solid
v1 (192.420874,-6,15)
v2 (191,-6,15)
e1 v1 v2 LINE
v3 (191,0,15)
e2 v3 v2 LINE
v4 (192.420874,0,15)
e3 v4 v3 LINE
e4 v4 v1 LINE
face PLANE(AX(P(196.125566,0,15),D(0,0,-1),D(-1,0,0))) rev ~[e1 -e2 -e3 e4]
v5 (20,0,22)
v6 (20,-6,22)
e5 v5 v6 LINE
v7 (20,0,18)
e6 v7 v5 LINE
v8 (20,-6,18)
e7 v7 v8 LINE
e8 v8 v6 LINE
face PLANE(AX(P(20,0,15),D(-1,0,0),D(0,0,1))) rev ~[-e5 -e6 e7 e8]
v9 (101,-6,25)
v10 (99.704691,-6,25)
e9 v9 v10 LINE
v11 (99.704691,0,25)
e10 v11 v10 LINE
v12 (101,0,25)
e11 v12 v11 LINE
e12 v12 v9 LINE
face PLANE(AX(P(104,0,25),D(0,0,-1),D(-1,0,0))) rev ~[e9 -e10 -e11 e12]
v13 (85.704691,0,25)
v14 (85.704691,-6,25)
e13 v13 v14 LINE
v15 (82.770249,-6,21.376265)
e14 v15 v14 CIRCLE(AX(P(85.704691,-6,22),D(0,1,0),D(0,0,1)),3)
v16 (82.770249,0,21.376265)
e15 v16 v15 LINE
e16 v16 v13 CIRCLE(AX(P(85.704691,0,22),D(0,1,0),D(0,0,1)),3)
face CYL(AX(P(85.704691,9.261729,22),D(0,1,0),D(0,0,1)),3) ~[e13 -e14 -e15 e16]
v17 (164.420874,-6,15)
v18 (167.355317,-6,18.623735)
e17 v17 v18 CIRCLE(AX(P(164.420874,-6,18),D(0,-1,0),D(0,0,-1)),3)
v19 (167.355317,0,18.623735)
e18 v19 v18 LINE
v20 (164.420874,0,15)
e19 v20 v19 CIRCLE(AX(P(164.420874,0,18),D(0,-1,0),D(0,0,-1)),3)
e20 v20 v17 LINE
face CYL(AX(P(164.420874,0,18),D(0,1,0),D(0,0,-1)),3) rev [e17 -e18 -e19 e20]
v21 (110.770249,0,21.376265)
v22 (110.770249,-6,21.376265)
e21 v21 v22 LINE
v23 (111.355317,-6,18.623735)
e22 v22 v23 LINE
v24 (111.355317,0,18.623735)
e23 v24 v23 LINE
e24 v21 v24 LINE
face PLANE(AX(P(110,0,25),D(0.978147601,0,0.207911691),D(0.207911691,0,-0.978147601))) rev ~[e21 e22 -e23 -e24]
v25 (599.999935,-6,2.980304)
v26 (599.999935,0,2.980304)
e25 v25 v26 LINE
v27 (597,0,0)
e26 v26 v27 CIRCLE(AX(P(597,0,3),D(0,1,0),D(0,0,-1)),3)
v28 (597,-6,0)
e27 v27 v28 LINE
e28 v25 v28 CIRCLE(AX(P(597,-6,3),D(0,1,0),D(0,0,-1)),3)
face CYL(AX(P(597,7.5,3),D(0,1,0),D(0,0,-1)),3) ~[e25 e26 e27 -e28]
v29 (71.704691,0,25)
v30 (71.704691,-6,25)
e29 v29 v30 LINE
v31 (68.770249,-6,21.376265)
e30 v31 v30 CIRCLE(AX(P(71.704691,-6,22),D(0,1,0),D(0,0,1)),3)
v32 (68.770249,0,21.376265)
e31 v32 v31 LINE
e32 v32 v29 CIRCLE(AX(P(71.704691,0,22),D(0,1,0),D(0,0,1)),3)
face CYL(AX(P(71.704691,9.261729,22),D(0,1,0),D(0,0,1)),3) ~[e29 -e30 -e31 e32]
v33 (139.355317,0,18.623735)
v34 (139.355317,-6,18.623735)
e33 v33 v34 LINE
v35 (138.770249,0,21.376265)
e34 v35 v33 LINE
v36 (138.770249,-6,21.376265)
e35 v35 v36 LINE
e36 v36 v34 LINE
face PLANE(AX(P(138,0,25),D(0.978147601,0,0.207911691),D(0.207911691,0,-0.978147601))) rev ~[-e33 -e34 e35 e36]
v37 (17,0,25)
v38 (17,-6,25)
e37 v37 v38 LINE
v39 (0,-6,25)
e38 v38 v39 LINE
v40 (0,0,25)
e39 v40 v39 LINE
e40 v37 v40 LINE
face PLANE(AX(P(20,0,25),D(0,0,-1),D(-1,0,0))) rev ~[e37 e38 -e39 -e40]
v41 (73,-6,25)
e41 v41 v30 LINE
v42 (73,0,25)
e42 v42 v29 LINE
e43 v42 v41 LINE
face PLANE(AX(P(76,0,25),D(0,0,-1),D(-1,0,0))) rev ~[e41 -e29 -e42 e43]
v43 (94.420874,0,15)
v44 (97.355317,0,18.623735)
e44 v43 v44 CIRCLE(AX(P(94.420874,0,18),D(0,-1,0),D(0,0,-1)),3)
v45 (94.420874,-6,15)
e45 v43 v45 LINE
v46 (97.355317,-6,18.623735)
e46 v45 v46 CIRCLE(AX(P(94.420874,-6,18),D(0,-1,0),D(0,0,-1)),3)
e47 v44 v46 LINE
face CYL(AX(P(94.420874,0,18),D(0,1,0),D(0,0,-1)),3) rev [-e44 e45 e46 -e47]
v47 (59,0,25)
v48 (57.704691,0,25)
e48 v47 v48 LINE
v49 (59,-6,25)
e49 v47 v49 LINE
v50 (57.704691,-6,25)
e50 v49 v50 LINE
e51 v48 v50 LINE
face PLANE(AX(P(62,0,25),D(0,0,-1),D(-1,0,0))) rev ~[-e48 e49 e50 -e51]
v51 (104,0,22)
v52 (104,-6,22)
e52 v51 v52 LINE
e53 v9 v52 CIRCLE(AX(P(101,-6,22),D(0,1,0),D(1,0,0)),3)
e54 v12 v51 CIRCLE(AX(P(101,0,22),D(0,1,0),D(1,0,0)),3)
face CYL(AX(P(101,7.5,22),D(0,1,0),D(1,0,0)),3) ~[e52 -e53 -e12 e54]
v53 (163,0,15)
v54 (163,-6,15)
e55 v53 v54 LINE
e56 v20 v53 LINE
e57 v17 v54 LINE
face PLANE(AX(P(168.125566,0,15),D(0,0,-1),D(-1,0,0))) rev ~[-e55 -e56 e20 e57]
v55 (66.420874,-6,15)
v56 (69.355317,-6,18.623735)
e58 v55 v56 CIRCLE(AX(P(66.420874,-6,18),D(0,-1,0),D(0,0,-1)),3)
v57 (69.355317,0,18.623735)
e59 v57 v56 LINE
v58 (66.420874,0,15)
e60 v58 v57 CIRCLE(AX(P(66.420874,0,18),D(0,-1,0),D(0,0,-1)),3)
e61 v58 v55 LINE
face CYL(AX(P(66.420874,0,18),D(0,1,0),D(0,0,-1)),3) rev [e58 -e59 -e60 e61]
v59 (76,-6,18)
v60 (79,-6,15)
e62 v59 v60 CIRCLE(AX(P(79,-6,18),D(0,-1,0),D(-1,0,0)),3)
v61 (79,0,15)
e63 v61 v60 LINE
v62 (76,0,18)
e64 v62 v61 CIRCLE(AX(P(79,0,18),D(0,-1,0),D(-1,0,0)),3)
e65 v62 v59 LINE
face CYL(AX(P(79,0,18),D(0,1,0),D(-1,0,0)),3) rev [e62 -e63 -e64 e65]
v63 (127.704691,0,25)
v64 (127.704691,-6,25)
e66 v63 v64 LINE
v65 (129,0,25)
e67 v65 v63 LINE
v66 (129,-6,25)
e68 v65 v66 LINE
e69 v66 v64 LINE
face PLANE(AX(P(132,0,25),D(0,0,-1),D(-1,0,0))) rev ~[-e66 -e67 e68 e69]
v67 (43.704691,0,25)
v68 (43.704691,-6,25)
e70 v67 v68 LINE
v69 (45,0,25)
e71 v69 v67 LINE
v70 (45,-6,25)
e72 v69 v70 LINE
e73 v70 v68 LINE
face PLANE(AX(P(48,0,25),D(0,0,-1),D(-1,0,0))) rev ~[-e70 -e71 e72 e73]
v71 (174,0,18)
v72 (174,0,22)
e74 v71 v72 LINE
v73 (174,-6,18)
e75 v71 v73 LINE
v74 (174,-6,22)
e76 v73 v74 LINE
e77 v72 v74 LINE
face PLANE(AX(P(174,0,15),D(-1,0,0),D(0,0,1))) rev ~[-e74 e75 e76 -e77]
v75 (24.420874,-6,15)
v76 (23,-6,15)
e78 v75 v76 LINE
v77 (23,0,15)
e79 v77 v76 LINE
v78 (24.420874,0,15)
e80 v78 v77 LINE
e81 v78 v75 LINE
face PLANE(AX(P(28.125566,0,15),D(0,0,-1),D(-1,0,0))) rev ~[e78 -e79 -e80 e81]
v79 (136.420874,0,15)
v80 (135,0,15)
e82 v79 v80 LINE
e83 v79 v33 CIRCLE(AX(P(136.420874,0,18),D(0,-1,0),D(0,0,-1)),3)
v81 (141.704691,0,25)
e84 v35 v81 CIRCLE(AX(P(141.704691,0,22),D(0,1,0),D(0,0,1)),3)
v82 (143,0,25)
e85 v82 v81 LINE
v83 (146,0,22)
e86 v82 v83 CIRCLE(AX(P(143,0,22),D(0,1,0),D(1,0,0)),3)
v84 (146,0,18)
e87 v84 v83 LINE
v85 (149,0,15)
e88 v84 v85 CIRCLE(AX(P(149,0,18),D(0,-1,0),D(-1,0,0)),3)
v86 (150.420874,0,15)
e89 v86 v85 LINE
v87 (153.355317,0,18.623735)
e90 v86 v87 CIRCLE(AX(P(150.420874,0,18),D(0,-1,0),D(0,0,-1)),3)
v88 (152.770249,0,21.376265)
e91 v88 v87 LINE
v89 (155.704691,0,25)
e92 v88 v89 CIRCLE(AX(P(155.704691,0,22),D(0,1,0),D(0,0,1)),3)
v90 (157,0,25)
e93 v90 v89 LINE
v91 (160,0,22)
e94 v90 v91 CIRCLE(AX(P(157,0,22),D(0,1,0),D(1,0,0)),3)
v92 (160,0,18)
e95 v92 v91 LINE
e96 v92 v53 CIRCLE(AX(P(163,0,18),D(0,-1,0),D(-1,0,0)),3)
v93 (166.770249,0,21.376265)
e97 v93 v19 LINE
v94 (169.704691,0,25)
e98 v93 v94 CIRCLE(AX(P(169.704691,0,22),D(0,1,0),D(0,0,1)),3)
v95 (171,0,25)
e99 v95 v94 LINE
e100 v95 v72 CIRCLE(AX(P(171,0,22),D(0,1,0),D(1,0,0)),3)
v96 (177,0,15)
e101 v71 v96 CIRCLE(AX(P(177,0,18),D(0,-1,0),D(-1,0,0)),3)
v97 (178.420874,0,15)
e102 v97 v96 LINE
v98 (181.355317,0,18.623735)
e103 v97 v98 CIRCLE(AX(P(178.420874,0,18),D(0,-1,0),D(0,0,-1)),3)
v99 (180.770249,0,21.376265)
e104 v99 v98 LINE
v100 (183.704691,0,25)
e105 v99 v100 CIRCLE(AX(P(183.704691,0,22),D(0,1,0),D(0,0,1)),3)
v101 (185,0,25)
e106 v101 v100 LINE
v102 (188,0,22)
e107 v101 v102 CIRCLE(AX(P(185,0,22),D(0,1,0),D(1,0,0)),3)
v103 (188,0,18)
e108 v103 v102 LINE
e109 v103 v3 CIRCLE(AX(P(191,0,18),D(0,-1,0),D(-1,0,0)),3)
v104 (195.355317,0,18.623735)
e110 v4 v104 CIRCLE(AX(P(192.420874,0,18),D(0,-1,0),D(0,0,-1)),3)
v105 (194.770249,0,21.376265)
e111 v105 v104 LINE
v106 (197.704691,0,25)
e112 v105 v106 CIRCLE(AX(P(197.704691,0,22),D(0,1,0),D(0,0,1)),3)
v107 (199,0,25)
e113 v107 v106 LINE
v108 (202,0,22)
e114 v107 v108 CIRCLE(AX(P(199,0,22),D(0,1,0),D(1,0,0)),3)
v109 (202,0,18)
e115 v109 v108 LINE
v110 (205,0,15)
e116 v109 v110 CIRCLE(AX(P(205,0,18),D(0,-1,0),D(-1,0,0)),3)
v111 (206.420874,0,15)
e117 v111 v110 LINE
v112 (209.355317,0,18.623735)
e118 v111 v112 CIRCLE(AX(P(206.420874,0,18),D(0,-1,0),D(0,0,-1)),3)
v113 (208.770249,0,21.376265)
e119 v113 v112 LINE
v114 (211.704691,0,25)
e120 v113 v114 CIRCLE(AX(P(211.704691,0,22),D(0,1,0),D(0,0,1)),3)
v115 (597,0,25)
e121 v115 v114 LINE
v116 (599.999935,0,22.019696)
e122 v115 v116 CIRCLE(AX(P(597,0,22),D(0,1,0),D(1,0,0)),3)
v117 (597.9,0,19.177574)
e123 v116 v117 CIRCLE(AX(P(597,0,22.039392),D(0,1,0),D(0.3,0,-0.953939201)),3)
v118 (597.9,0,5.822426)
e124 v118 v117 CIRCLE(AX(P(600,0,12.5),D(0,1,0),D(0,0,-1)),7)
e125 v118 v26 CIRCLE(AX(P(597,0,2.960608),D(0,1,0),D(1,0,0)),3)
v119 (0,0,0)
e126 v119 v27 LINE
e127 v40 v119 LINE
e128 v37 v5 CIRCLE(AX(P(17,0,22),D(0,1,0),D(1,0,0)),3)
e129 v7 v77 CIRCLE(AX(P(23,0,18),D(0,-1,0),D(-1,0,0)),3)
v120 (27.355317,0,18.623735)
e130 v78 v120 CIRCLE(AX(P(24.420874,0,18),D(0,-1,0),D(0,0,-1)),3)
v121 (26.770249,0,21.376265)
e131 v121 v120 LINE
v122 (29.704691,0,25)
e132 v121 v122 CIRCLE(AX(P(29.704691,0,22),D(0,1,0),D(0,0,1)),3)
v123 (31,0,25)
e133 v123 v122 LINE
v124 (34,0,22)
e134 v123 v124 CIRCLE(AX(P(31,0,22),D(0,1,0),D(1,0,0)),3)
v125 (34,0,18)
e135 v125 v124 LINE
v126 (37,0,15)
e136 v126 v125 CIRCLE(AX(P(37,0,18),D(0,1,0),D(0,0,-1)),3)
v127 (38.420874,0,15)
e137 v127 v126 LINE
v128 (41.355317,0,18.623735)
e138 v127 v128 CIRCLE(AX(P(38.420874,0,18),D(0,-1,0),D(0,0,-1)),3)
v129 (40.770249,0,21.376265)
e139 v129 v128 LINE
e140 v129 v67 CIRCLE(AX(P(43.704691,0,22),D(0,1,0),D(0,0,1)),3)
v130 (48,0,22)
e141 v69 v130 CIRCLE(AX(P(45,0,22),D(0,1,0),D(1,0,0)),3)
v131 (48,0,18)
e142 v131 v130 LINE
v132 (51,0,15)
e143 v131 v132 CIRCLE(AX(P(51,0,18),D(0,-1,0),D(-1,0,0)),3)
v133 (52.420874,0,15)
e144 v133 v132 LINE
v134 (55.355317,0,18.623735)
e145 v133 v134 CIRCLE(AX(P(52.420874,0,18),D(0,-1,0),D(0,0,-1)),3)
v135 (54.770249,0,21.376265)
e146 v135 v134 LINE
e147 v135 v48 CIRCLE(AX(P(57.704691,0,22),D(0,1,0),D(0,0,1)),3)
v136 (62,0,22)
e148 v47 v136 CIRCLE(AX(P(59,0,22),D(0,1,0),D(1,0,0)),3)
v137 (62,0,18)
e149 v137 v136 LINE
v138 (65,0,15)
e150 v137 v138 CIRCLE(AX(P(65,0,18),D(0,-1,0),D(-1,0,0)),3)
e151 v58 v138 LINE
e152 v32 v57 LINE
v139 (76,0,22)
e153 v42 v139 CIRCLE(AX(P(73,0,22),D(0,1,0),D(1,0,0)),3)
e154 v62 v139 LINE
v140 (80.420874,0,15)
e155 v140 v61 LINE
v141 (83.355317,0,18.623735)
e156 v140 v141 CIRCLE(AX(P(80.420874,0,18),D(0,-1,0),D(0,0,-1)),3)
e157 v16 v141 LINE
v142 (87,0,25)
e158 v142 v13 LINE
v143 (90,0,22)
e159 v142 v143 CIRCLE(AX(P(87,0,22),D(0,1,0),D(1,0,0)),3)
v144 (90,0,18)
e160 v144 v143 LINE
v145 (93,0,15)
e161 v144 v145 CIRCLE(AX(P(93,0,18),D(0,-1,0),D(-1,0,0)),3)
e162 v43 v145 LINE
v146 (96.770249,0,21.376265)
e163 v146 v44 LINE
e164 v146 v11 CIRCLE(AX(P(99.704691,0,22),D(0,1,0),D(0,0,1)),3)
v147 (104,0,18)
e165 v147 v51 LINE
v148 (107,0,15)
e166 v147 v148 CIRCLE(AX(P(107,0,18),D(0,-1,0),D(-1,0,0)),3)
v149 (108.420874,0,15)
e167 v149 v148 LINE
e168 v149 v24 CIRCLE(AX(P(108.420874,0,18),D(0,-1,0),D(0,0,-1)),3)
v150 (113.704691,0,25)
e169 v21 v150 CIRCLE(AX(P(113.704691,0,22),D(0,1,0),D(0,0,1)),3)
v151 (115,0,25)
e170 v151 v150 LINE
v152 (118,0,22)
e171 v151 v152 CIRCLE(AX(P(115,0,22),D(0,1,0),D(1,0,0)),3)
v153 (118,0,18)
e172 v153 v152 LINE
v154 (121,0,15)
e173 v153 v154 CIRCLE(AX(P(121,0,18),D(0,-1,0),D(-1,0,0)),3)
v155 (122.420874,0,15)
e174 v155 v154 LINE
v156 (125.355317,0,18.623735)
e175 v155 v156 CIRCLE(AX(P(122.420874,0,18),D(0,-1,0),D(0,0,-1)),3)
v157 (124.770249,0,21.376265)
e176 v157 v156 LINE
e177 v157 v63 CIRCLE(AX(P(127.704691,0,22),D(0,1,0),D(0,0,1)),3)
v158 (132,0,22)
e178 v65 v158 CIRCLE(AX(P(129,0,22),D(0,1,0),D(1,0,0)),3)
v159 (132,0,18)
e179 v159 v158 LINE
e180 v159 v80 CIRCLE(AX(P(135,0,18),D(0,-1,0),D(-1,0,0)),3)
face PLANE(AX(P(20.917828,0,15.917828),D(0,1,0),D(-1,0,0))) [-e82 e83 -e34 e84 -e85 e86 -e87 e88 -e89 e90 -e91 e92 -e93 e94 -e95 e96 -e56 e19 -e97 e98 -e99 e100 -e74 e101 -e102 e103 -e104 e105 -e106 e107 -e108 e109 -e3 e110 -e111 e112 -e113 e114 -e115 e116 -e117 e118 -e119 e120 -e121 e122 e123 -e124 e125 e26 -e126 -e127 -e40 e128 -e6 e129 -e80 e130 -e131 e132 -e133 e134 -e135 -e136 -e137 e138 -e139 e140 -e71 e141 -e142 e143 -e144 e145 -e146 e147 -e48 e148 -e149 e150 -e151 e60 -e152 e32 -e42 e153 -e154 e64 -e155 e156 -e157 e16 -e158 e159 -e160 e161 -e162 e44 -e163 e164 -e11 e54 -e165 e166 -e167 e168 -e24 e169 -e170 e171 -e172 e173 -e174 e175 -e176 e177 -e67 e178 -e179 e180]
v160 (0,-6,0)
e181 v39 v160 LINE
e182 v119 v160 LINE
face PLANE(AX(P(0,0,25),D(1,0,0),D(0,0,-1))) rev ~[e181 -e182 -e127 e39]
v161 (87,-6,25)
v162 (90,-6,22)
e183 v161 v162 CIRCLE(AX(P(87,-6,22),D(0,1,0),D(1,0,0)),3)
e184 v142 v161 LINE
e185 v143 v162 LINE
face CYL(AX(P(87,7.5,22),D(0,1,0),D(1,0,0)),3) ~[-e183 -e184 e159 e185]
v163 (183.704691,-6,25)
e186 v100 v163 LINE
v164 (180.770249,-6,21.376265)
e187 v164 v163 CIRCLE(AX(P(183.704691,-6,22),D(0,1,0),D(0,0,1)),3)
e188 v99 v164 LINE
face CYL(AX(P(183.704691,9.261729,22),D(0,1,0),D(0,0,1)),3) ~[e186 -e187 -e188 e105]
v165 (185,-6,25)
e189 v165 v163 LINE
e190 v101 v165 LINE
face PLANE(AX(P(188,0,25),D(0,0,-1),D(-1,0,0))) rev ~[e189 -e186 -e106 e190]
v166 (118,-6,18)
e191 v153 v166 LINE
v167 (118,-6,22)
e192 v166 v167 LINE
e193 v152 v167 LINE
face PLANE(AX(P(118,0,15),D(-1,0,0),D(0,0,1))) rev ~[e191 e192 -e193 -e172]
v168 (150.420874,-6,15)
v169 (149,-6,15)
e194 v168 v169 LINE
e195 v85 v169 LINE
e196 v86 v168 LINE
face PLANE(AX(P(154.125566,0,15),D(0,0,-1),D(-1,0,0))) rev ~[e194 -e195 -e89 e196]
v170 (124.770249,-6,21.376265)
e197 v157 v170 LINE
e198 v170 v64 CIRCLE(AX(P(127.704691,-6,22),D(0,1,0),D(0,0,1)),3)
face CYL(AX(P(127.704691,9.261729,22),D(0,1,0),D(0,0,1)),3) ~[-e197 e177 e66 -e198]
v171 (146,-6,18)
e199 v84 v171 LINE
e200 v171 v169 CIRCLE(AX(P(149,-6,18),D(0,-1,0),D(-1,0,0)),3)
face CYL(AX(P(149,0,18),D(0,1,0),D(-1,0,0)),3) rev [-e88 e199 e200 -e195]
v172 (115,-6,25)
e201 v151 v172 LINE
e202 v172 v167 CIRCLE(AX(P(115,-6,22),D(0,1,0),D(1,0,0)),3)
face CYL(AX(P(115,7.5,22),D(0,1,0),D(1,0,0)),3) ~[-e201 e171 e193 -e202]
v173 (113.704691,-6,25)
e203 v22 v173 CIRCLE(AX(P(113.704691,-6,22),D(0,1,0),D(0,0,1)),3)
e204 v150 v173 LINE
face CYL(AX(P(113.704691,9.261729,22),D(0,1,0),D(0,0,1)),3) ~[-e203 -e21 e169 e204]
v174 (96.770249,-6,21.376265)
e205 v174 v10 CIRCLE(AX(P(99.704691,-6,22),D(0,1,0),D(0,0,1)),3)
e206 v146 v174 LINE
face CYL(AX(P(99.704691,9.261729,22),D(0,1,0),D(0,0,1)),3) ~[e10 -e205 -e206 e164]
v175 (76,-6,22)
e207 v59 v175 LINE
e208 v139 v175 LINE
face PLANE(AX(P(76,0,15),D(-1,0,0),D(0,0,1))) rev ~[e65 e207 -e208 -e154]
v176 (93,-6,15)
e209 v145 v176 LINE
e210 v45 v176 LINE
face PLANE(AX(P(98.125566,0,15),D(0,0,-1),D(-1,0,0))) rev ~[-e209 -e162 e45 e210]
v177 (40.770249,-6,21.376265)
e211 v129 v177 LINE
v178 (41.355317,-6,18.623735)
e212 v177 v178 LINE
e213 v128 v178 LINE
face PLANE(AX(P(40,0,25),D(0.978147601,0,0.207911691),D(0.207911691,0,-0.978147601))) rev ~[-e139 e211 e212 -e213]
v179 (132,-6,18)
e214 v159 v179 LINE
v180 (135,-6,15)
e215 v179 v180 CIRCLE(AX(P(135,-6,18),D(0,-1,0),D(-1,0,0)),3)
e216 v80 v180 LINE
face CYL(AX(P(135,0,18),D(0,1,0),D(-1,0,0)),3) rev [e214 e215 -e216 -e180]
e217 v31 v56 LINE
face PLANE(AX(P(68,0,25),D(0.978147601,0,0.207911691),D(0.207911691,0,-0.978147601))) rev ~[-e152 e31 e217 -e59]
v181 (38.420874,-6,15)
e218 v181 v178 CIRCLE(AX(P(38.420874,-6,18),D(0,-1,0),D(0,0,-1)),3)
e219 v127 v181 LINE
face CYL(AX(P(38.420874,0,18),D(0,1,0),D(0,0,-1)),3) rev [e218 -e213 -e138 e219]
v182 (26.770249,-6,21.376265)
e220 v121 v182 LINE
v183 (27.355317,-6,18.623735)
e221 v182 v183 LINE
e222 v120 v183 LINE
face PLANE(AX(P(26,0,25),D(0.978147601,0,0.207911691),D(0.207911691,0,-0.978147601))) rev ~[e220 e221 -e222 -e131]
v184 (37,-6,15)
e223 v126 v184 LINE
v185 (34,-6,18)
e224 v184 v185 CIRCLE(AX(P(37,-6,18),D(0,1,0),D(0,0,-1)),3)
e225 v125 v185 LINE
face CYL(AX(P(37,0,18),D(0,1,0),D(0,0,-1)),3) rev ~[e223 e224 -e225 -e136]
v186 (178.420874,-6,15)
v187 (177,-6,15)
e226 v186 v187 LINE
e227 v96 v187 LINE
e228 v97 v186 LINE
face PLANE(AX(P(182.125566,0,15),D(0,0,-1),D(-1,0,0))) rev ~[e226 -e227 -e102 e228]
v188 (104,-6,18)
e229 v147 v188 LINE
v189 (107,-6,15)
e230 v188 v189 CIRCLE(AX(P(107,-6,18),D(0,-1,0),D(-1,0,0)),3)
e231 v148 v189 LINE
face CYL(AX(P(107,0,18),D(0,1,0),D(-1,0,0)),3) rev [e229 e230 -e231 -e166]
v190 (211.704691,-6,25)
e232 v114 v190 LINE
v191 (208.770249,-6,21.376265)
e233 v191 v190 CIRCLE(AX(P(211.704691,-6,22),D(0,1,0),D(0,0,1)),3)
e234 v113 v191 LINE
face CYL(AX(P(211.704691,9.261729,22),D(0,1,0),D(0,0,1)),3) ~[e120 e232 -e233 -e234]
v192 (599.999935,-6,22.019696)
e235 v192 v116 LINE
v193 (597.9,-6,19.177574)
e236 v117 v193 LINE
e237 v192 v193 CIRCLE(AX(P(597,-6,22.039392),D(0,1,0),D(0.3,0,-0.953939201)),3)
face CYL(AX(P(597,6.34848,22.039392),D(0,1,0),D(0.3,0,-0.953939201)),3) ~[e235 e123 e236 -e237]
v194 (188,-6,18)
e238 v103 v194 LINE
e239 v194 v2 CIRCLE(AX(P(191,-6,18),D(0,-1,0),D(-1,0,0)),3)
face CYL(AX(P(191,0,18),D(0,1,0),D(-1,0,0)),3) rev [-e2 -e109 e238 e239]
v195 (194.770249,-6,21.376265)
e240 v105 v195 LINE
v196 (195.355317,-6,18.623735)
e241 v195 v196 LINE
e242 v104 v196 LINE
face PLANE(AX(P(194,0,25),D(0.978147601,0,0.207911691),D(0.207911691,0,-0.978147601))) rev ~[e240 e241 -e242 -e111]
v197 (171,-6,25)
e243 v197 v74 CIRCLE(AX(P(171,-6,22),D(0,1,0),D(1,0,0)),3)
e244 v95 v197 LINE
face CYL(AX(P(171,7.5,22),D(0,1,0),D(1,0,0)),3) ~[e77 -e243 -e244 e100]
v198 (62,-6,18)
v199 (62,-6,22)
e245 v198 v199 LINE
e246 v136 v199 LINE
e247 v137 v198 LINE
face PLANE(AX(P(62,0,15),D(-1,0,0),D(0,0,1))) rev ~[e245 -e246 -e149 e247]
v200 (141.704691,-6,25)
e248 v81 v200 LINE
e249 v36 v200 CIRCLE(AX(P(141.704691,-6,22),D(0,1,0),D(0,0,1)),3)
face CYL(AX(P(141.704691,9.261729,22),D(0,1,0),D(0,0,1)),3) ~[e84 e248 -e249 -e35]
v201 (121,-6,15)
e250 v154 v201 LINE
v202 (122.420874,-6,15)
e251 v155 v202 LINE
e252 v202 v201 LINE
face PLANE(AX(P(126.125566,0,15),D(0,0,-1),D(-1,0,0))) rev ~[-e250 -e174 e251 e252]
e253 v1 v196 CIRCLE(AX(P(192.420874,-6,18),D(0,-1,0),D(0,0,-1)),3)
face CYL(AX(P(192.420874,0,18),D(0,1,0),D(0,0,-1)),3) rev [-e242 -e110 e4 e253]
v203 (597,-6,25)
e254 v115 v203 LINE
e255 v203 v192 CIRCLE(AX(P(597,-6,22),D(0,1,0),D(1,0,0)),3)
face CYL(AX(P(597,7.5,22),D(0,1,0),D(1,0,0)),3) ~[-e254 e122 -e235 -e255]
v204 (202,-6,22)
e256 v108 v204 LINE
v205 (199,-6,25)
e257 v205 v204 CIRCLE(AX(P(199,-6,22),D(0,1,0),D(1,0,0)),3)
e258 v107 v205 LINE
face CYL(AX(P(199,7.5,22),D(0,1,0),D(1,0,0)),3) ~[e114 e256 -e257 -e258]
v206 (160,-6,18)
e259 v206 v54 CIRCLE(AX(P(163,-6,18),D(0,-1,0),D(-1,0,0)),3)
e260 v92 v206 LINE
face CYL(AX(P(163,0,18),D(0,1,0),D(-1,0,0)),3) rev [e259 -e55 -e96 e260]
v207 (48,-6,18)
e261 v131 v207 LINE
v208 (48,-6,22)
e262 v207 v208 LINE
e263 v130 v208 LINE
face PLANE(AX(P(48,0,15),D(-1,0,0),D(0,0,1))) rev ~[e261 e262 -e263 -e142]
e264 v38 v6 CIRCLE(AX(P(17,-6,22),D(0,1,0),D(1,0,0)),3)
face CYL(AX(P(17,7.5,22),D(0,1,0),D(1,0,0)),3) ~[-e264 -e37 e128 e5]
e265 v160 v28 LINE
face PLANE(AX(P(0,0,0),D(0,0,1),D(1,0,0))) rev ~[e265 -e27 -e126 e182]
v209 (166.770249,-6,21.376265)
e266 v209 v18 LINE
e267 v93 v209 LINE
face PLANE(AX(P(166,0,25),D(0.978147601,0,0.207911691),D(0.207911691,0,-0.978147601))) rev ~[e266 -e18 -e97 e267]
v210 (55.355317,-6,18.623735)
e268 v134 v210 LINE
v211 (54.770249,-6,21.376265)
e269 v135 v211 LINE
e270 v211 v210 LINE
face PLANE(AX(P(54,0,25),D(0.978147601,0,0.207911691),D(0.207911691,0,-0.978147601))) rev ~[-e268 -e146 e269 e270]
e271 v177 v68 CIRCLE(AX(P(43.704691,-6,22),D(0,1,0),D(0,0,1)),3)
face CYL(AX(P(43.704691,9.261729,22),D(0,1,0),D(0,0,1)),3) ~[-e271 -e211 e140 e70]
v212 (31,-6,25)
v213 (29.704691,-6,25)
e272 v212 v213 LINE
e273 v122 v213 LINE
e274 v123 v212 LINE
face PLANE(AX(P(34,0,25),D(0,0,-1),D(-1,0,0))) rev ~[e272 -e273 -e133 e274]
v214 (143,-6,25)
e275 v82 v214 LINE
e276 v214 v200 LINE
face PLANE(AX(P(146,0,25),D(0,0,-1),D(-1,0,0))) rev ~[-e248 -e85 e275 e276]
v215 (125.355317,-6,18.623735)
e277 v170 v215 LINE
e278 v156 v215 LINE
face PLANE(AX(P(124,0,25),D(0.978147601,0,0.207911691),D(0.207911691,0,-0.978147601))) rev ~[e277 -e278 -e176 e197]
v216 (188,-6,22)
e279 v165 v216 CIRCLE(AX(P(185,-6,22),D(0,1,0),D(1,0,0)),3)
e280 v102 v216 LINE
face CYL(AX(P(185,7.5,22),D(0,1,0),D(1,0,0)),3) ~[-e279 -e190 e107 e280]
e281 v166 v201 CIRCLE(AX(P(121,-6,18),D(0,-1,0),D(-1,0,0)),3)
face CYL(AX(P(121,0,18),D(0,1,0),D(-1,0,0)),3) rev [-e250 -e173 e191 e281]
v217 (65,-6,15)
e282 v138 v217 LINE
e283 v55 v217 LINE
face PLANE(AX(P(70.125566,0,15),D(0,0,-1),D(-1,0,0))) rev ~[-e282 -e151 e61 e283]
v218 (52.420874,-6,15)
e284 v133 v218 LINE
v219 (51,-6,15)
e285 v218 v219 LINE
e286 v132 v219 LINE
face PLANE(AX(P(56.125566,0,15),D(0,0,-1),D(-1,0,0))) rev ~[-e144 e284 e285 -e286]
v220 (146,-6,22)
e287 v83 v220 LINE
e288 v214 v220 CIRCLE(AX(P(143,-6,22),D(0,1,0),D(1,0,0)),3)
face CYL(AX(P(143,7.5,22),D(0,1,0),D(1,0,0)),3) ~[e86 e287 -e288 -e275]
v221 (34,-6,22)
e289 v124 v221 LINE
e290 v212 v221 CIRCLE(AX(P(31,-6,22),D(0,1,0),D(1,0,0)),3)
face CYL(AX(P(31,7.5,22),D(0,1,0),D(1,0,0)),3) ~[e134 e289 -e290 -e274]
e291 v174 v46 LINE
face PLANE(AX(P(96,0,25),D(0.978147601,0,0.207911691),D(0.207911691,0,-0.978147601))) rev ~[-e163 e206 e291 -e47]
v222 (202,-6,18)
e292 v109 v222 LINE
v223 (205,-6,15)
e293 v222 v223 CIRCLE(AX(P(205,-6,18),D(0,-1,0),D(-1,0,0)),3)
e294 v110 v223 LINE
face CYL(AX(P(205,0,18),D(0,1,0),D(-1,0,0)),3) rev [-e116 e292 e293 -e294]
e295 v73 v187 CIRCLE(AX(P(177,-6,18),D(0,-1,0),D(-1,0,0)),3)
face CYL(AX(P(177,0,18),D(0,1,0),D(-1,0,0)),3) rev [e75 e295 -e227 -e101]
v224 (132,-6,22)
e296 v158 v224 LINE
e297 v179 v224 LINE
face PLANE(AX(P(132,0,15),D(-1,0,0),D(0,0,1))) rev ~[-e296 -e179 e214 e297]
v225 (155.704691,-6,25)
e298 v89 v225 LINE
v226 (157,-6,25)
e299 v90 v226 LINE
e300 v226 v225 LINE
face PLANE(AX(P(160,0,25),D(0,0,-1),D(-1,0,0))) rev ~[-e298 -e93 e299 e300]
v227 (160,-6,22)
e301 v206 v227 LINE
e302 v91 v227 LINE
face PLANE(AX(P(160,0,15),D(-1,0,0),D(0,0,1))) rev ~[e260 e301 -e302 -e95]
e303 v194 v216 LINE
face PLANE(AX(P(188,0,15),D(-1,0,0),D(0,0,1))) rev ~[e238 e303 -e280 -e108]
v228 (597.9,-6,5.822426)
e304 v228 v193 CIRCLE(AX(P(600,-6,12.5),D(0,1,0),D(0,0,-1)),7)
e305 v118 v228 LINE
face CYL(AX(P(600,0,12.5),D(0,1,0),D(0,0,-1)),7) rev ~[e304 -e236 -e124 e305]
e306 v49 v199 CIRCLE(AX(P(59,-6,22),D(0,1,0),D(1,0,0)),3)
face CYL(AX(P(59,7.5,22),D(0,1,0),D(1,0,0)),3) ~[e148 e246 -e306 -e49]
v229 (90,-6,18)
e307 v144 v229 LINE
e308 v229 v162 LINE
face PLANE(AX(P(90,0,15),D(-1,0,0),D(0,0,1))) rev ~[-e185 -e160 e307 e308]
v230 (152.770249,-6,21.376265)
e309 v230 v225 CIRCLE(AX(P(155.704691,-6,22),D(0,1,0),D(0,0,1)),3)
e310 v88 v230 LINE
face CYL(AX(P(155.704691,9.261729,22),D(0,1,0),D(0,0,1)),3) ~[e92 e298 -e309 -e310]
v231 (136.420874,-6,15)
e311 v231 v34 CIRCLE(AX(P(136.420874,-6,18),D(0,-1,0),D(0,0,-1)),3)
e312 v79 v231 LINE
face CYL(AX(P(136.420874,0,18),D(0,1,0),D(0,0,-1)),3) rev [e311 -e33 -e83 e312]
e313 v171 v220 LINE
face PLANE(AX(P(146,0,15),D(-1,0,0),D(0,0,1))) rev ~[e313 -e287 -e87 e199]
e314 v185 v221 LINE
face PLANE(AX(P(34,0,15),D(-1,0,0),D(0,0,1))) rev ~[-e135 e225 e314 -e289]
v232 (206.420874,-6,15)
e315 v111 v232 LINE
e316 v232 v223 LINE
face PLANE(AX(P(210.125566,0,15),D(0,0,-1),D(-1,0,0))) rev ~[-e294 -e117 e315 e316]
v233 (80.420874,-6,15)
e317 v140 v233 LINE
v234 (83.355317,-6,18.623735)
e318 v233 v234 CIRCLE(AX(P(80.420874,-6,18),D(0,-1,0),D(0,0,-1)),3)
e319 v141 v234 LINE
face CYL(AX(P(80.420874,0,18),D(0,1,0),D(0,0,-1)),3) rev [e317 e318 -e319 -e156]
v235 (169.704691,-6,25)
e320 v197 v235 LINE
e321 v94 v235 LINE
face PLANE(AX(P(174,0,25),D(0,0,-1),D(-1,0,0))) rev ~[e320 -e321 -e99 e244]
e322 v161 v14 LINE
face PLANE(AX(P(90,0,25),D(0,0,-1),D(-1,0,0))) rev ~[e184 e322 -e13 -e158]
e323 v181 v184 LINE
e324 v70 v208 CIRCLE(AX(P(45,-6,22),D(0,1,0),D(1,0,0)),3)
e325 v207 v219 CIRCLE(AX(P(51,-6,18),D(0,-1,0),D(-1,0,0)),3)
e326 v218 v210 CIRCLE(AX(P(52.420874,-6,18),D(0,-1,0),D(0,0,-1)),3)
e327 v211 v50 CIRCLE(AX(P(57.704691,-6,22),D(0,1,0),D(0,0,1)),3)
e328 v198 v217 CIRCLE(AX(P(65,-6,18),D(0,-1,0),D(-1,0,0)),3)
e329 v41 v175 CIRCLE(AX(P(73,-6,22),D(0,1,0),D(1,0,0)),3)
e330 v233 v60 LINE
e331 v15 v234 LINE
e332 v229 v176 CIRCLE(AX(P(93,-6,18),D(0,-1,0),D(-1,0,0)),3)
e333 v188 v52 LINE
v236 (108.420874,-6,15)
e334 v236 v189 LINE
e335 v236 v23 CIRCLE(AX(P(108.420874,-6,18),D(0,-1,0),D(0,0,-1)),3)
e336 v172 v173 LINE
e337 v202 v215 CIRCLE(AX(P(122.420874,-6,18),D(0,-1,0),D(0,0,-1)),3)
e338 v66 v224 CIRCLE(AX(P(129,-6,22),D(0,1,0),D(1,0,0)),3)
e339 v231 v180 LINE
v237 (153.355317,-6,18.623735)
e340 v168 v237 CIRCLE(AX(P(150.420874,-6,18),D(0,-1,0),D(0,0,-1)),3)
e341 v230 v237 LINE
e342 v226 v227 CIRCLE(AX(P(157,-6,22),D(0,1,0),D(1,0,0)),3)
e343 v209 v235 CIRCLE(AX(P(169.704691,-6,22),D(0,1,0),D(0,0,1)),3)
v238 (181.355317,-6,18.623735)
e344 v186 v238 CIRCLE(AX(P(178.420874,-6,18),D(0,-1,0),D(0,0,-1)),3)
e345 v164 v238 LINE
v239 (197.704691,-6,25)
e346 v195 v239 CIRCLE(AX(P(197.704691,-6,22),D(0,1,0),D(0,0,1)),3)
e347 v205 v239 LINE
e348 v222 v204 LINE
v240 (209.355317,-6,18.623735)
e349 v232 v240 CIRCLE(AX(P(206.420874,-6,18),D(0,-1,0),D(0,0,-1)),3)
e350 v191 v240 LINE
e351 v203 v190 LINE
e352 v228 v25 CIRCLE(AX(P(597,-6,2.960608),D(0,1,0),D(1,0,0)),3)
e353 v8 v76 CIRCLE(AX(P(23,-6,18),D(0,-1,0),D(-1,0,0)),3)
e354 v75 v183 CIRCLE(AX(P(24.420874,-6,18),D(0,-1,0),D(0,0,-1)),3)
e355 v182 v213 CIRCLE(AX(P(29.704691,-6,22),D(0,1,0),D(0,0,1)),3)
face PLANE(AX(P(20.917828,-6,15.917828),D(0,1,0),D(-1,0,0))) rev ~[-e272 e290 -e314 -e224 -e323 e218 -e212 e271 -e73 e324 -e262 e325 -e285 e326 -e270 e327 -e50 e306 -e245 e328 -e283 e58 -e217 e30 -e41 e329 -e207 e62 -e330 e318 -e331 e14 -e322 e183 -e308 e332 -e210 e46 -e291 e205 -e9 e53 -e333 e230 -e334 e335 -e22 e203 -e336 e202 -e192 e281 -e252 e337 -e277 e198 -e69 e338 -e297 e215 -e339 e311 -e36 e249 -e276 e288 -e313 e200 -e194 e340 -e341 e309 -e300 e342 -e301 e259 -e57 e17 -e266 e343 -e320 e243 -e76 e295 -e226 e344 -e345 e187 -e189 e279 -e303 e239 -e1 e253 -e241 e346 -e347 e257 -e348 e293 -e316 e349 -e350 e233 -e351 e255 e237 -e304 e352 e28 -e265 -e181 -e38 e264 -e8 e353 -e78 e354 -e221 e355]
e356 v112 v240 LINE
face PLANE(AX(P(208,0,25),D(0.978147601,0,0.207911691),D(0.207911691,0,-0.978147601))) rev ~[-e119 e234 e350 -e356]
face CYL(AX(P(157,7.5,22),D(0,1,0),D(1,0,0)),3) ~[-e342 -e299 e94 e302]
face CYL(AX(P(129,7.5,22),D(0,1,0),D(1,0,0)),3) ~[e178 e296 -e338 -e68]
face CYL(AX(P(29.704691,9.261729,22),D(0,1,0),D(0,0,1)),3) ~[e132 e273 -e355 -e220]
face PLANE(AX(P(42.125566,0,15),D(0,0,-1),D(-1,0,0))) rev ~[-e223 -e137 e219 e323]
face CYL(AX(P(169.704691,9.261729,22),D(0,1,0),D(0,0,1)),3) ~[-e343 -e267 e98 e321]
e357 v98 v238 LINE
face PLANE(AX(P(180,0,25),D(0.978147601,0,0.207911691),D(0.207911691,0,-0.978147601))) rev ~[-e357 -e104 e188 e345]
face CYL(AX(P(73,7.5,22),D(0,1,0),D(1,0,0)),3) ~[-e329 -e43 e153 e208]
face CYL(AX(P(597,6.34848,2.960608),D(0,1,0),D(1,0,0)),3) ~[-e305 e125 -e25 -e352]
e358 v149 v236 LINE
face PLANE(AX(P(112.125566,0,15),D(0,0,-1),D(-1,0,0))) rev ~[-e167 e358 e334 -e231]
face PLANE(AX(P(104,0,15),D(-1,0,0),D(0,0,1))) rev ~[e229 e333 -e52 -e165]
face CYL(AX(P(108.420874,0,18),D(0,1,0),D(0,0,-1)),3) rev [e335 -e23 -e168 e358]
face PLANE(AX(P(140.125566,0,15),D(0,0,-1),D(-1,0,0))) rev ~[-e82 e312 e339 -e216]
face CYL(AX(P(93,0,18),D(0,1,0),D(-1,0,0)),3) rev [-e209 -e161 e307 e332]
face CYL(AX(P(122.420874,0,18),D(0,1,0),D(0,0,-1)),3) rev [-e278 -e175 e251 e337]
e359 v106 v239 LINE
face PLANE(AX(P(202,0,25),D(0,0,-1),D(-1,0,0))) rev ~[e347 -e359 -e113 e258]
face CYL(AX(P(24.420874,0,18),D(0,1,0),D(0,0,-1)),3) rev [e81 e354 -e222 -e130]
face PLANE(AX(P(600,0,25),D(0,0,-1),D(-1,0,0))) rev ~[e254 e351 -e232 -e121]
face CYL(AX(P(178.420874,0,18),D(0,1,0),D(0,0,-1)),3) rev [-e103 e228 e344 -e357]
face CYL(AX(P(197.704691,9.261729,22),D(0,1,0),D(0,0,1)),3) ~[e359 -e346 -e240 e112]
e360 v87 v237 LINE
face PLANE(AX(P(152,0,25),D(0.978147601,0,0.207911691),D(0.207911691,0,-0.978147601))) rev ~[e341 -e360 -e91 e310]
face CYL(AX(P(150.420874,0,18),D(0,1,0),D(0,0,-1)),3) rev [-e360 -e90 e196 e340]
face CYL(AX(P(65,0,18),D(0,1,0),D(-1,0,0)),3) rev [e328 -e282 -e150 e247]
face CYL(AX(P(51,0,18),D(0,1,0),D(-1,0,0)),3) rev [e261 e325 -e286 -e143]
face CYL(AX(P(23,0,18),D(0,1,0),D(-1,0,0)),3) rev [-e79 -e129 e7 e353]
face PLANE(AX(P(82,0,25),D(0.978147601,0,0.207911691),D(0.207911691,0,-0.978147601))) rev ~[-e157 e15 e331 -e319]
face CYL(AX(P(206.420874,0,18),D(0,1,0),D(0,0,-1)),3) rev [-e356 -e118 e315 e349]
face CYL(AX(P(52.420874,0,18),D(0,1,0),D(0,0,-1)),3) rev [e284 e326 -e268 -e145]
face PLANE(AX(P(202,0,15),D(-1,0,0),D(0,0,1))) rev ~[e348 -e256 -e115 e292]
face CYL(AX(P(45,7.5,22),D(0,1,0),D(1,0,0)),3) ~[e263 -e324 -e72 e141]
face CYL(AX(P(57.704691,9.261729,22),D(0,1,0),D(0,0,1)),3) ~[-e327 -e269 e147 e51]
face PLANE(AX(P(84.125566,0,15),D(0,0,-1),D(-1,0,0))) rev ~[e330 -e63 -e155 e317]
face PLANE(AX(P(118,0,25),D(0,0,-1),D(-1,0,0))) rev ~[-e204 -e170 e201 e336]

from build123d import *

# Parameters (mm, degrees)
F1_DEPTH    = 6
F2_T1_DEPTH = 6
F2_T3_DEPTH = 24.523457348
F2_T5_DEPTH = 21
F2_T7_DEPTH = 18.6969600709


# Not quite as in the source:
# - a fillet or chamfer that OpenCascade refuses, or shapes differently, is made with other operations: its cross-section is extruded or revolved along the edge and cut away or added


with BuildPart() as f1:
    # F0 (on Front) → F1 (new body)
    with BuildSketch(Plane.XZ):
        with BuildLine():
            Line((0, 25), (0, 0))
            Line((0, 0), (600, 0))
            Line((600, 0), (600, 5.5))
            ThreePointArc((600, 5.5), (593, 12.5), (600, 19.5))
            Line((600, 19.5), (600, 25))
            Line((600, 25), (208, 25))
            Line((208, 25), (210.1255656167, 15))
            Line((210.1255656167, 15), (208, 15))
            Line((208, 15), (202, 15))
            Line((202, 15), (202, 25))
            Line((202, 25), (194, 25))
            Line((194, 25), (196.1255656167, 15))
            Line((196.1255656167, 15), (194, 15))
            Line((194, 15), (188, 15))
            Line((188, 15), (188, 25))
            Line((188, 25), (180, 25))
            Line((180, 25), (182.1255656167, 15))
            Line((182.1255656167, 15), (180, 15))
            Line((180, 15), (174, 15))
            Line((174, 15), (174, 25))
            Line((174, 25), (166, 25))
            Line((166, 25), (168.1255656167, 15))
            Line((168.1255656167, 15), (166, 15))
            Line((166, 15), (160, 15))
            Line((160, 15), (160, 25))
            Line((160, 25), (152, 25))
            Line((152, 25), (154.1255656167, 15))
            Line((154.1255656167, 15), (152, 15))
            Line((152, 15), (146, 15))
            Line((146, 15), (146, 25))
            Line((146, 25), (138, 25))
            Line((138, 25), (140.1255656167, 15))
            Line((140.1255656167, 15), (138, 15))
            Line((138, 15), (132, 15))
            Line((132, 15), (132, 25))
            Line((132, 25), (124, 25))
            Line((124, 25), (126.1255656167, 15))
            Line((126.1255656167, 15), (124, 15))
            Line((124, 15), (118, 15))
            Line((118, 15), (118, 25))
            Line((118, 25), (110, 25))
            Line((110, 25), (112.1255656167, 15))
            Line((112.1255656167, 15), (110, 15))
            Line((110, 15), (104, 15))
            Line((104, 15), (104, 25))
            Line((104, 25), (96, 25))
            Line((96, 25), (98.1255656167, 15))
            Line((98.1255656167, 15), (96, 15))
            Line((96, 15), (90, 15))
            Line((90, 15), (90, 25))
            Line((90, 25), (82, 25))
            Line((82, 25), (84.1255656167, 15))
            Line((84.1255656167, 15), (82, 15))
            Line((82, 15), (76, 15))
            Line((76, 15), (76, 25))
            Line((76, 25), (68, 25))
            Line((68, 25), (70.1255656167, 15))
            Line((70.1255656167, 15), (68, 15))
            Line((68, 15), (62, 15))
            Line((62, 15), (62, 25))
            Line((62, 25), (54, 25))
            Line((54, 25), (56.1255656167, 15))
            Line((56.1255656167, 15), (54, 15))
            Line((54, 15), (48, 15))
            Line((48, 15), (48, 25))
            Line((48, 25), (40, 25))
            Line((40, 25), (42.1255656167, 15))
            Line((42.1255656167, 15), (40, 15))
            Line((40, 15), (34, 15))
            Line((34, 15), (34, 25))
            Line((34, 25), (26, 25))
            Line((26, 25), (28.1255656167, 15))
            Line((28.1255656167, 15), (26, 15))
            Line((26, 15), (20, 15))
            Line((20, 15), (20, 25))
            Line((20, 25), (0, 25))
        make_face()
    extrude(amount=F1_DEPTH)

    # F2: fillet of radius 3 on 60 edges, made by hand

    # F2_s2 → F2_t1 (join)
    with BuildSketch(Plane.XZ):
        with BuildLine():
            ThreePointArc((20, 18), (20.8786796564, 15.8786796564), (23, 15))
            Line((23, 15), (20, 15))
            Line((20, 15), (20, 18))
        make_face()
        with BuildLine():
            ThreePointArc((37, 15), (34.8786796564, 15.8786796564), (34, 18))
            Line((34, 18), (34, 15))
            Line((34, 15), (37, 15))
        make_face()
        with BuildLine():
            ThreePointArc((48, 18), (48.8786796564, 15.8786796564), (51, 15))
            Line((51, 15), (48, 15))
            Line((48, 15), (48, 18))
        make_face()
        with BuildLine():
            ThreePointArc((62, 18), (62.8786796564, 15.8786796564), (65, 15))
            Line((65, 15), (62, 15))
            Line((62, 15), (62, 18))
        make_face()
        with BuildLine():
            ThreePointArc((76, 18), (76.8786796564, 15.8786796564), (79, 15))
            Line((79, 15), (76, 15))
            Line((76, 15), (76, 18))
        make_face()
        with BuildLine():
            ThreePointArc((90, 18), (90.8786796564, 15.8786796564), (93, 15))
            Line((93, 15), (90, 15))
            Line((90, 15), (90, 18))
        make_face()
        with BuildLine():
            ThreePointArc((104, 18), (104.8786796564, 15.8786796564), (107, 15))
            Line((107, 15), (104, 15))
            Line((104, 15), (104, 18))
        make_face()
        with BuildLine():
            ThreePointArc((118, 18), (118.8786796564, 15.8786796564), (121, 15))
            Line((121, 15), (118, 15))
            Line((118, 15), (118, 18))
        make_face()
        with BuildLine():
            ThreePointArc((132, 18), (132.8786796564, 15.8786796564), (135, 15))
            Line((135, 15), (132, 15))
            Line((132, 15), (132, 18))
        make_face()
        with BuildLine():
            ThreePointArc((146, 18), (146.8786796564, 15.8786796564), (149, 15))
            Line((149, 15), (146, 15))
            Line((146, 15), (146, 18))
        make_face()
        with BuildLine():
            ThreePointArc((160, 18), (160.8786796564, 15.8786796564), (163, 15))
            Line((163, 15), (160, 15))
            Line((160, 15), (160, 18))
        make_face()
        with BuildLine():
            ThreePointArc((174, 18), (174.8786796564, 15.8786796564), (177, 15))
            Line((177, 15), (174, 15))
            Line((174, 15), (174, 18))
        make_face()
        with BuildLine():
            ThreePointArc((188, 18), (188.8786796564, 15.8786796564), (191, 15))
            Line((191, 15), (188, 15))
            Line((188, 15), (188, 18))
        make_face()
        with BuildLine():
            ThreePointArc((202, 18), (202.8786796564, 15.8786796564), (205, 15))
            Line((205, 15), (202, 15))
            Line((202, 15), (202, 18))
        make_face()
        with BuildLine():
            ThreePointArc((24.4208741471, 15), (26.7523120315, 16.1120388269), (27.3553169493, 18.6237350725))
            Line((27.3553169493, 18.6237350725), (28.1255656167, 15))
            Line((28.1255656167, 15), (24.4208741471, 15))
        make_face()
        with BuildLine():
            ThreePointArc((38.4208741471, 15), (40.7523120315, 16.1120388269), (41.3553169493, 18.6237350725))
            Line((41.3553169493, 18.6237350725), (42.1255656167, 15))
            Line((42.1255656167, 15), (38.4208741471, 15))
        make_face()
        with BuildLine():
            ThreePointArc((52.4208741471, 15), (54.7523120315, 16.1120388269), (55.3553169493, 18.6237350725))
            Line((55.3553169493, 18.6237350725), (56.1255656167, 15))
            Line((56.1255656167, 15), (52.4208741471, 15))
        make_face()
        with BuildLine():
            ThreePointArc((66.4208741471, 15), (68.7523120315, 16.1120388269), (69.3553169493, 18.6237350725))
            Line((69.3553169493, 18.6237350725), (70.1255656167, 15))
            Line((70.1255656167, 15), (66.4208741471, 15))
        make_face()
        with BuildLine():
            ThreePointArc((80.4208741471, 15), (82.7523120315, 16.1120388269), (83.3553169493, 18.6237350725))
            Line((83.3553169493, 18.6237350725), (84.1255656167, 15))
            Line((84.1255656167, 15), (80.4208741471, 15))
        make_face()
        with BuildLine():
            ThreePointArc((94.4208741471, 15), (96.7523120315, 16.1120388269), (97.3553169493, 18.6237350725))
            Line((97.3553169493, 18.6237350725), (98.1255656167, 15))
            Line((98.1255656167, 15), (94.4208741471, 15))
        make_face()
        with BuildLine():
            ThreePointArc((108.4208741471, 15), (110.7523120315, 16.1120388269), (111.3553169493, 18.6237350725))
            Line((111.3553169493, 18.6237350725), (112.1255656167, 15))
            Line((112.1255656167, 15), (108.4208741471, 15))
        make_face()
        with BuildLine():
            ThreePointArc((122.4208741471, 15), (124.7523120315, 16.1120388269), (125.3553169493, 18.6237350725))
            Line((125.3553169493, 18.6237350725), (126.1255656167, 15))
            Line((126.1255656167, 15), (122.4208741471, 15))
        make_face()
        with BuildLine():
            ThreePointArc((136.4208741471, 15), (138.7523120315, 16.1120388269), (139.3553169493, 18.6237350725))
            Line((139.3553169493, 18.6237350725), (140.1255656167, 15))
            Line((140.1255656167, 15), (136.4208741471, 15))
        make_face()
        with BuildLine():
            ThreePointArc((150.4208741471, 15), (152.7523120315, 16.1120388269), (153.3553169493, 18.6237350725))
            Line((153.3553169493, 18.6237350725), (154.1255656167, 15))
            Line((154.1255656167, 15), (150.4208741471, 15))
        make_face()
        with BuildLine():
            ThreePointArc((164.4208741471, 15), (166.7523120315, 16.1120388269), (167.3553169493, 18.6237350725))
            Line((167.3553169493, 18.6237350725), (168.1255656167, 15))
            Line((168.1255656167, 15), (164.4208741471, 15))
        make_face()
        with BuildLine():
            ThreePointArc((178.4208741471, 15), (180.7523120315, 16.1120388269), (181.3553169493, 18.6237350725))
            Line((181.3553169493, 18.6237350725), (182.1255656167, 15))
            Line((182.1255656167, 15), (178.4208741471, 15))
        make_face()
        with BuildLine():
            ThreePointArc((192.4208741471, 15), (194.7523120315, 16.1120388269), (195.3553169493, 18.6237350725))
            Line((195.3553169493, 18.6237350725), (196.1255656167, 15))
            Line((196.1255656167, 15), (192.4208741471, 15))
        make_face()
        with BuildLine():
            ThreePointArc((206.4208741471, 15), (208.7523120315, 16.1120388269), (209.3553169493, 18.6237350725))
            Line((209.3553169493, 18.6237350725), (210.1255656167, 15))
            Line((210.1255656167, 15), (206.4208741471, 15))
        make_face()
    extrude(amount=F2_T1_DEPTH)

    # F2_s4 → F2_t3 (cut)
    with BuildSketch(Plane.XZ.offset(-9.261728674)):
        with BuildLine():
            ThreePointArc((29.7046914696, 25), (27.3732535852, 23.8879611731), (26.7702486674, 21.3762649275))
            Line((26.7702486674, 21.3762649275), (26, 25))
            Line((26, 25), (29.7046914696, 25))
        make_face()
        with BuildLine():
            ThreePointArc((43.7046914696, 25), (41.3732535852, 23.8879611731), (40.7702486674, 21.3762649275))
            Line((40.7702486674, 21.3762649275), (40, 25))
            Line((40, 25), (43.7046914696, 25))
        make_face()
        with BuildLine():
            ThreePointArc((57.7046914696, 25), (55.3732535852, 23.8879611731), (54.7702486674, 21.3762649275))
            Line((54.7702486674, 21.3762649275), (54, 25))
            Line((54, 25), (57.7046914696, 25))
        make_face()
        with BuildLine():
            ThreePointArc((71.7046914696, 25), (69.3732535852, 23.8879611731), (68.7702486674, 21.3762649275))
            Line((68.7702486674, 21.3762649275), (68, 25))
            Line((68, 25), (71.7046914696, 25))
        make_face()
        with BuildLine():
            ThreePointArc((85.7046914696, 25), (83.3732535852, 23.8879611731), (82.7702486674, 21.3762649275))
            Line((82.7702486674, 21.3762649275), (82, 25))
            Line((82, 25), (85.7046914696, 25))
        make_face()
        with BuildLine():
            ThreePointArc((99.7046914696, 25), (97.3732535852, 23.8879611731), (96.7702486674, 21.3762649275))
            Line((96.7702486674, 21.3762649275), (96, 25))
            Line((96, 25), (99.7046914696, 25))
        make_face()
        with BuildLine():
            ThreePointArc((113.7046914696, 25), (111.3732535852, 23.8879611731), (110.7702486674, 21.3762649275))
            Line((110.7702486674, 21.3762649275), (110, 25))
            Line((110, 25), (113.7046914696, 25))
        make_face()
        with BuildLine():
            ThreePointArc((127.7046914696, 25), (125.3732535852, 23.8879611731), (124.7702486674, 21.3762649275))
            Line((124.7702486674, 21.3762649275), (124, 25))
            Line((124, 25), (127.7046914696, 25))
        make_face()
        with BuildLine():
            ThreePointArc((141.7046914696, 25), (139.3732535852, 23.8879611731), (138.7702486674, 21.3762649275))
            Line((138.7702486674, 21.3762649275), (138, 25))
            Line((138, 25), (141.7046914696, 25))
        make_face()
        with BuildLine():
            ThreePointArc((155.7046914696, 25), (153.3732535852, 23.8879611731), (152.7702486674, 21.3762649275))
            Line((152.7702486674, 21.3762649275), (152, 25))
            Line((152, 25), (155.7046914696, 25))
        make_face()
        with BuildLine():
            ThreePointArc((169.7046914696, 25), (167.3732535852, 23.8879611731), (166.7702486674, 21.3762649275))
            Line((166.7702486674, 21.3762649275), (166, 25))
            Line((166, 25), (169.7046914696, 25))
        make_face()
        with BuildLine():
            ThreePointArc((183.7046914696, 25), (181.3732535852, 23.8879611731), (180.7702486674, 21.3762649275))
            Line((180.7702486674, 21.3762649275), (180, 25))
            Line((180, 25), (183.7046914696, 25))
        make_face()
        with BuildLine():
            ThreePointArc((197.7046914696, 25), (195.3732535852, 23.8879611731), (194.7702486674, 21.3762649275))
            Line((194.7702486674, 21.3762649275), (194, 25))
            Line((194, 25), (197.7046914696, 25))
        make_face()
        with BuildLine():
            ThreePointArc((211.7046914696, 25), (209.3732535852, 23.8879611731), (208.7702486674, 21.3762649275))
            Line((208.7702486674, 21.3762649275), (208, 25))
            Line((208, 25), (211.7046914696, 25))
        make_face()
    extrude(amount=F2_T3_DEPTH, mode=Mode.SUBTRACT)

    # F2_s6 → F2_t5 (cut)
    with BuildSketch(Plane.XZ.offset(-7.5)):
        with BuildLine():
            ThreePointArc((20, 22), (19.1213203436, 24.1213203436), (17, 25))
            Line((17, 25), (20, 25))
            Line((20, 25), (20, 22))
        make_face()
        with BuildLine():
            ThreePointArc((34, 22), (33.1213203436, 24.1213203436), (31, 25))
            Line((31, 25), (34, 25))
            Line((34, 25), (34, 22))
        make_face()
        with BuildLine():
            ThreePointArc((48, 22), (47.1213203436, 24.1213203436), (45, 25))
            Line((45, 25), (48, 25))
            Line((48, 25), (48, 22))
        make_face()
        with BuildLine():
            ThreePointArc((62, 22), (61.1213203436, 24.1213203436), (59, 25))
            Line((59, 25), (62, 25))
            Line((62, 25), (62, 22))
        make_face()
        with BuildLine():
            ThreePointArc((76, 22), (75.1213203436, 24.1213203436), (73, 25))
            Line((73, 25), (76, 25))
            Line((76, 25), (76, 22))
        make_face()
        with BuildLine():
            ThreePointArc((90, 22), (89.1213203436, 24.1213203436), (87, 25))
            Line((87, 25), (90, 25))
            Line((90, 25), (90, 22))
        make_face()
        with BuildLine():
            ThreePointArc((104, 22), (103.1213203436, 24.1213203436), (101, 25))
            Line((101, 25), (104, 25))
            Line((104, 25), (104, 22))
        make_face()
        with BuildLine():
            ThreePointArc((118, 22), (117.1213203436, 24.1213203436), (115, 25))
            Line((115, 25), (118, 25))
            Line((118, 25), (118, 22))
        make_face()
        with BuildLine():
            ThreePointArc((132, 22), (131.1213203436, 24.1213203436), (129, 25))
            Line((129, 25), (132, 25))
            Line((132, 25), (132, 22))
        make_face()
        with BuildLine():
            ThreePointArc((146, 22), (145.1213203436, 24.1213203436), (143, 25))
            Line((143, 25), (146, 25))
            Line((146, 25), (146, 22))
        make_face()
        with BuildLine():
            ThreePointArc((160, 22), (159.1213203436, 24.1213203436), (157, 25))
            Line((157, 25), (160, 25))
            Line((160, 25), (160, 22))
        make_face()
        with BuildLine():
            ThreePointArc((174, 22), (173.1213203436, 24.1213203436), (171, 25))
            Line((171, 25), (174, 25))
            Line((174, 25), (174, 22))
        make_face()
        with BuildLine():
            ThreePointArc((188, 22), (187.1213203436, 24.1213203436), (185, 25))
            Line((185, 25), (188, 25))
            Line((188, 25), (188, 22))
        make_face()
        with BuildLine():
            ThreePointArc((202, 22), (201.1213203436, 24.1213203436), (199, 25))
            Line((199, 25), (202, 25))
            Line((202, 25), (202, 22))
        make_face()
        with BuildLine():
            ThreePointArc((600, 22), (599.1213203436, 24.1213203436), (597, 25))
            Line((597, 25), (600, 25))
            Line((600, 25), (600, 22))
        make_face()
        with BuildLine():
            ThreePointArc((597, 0), (599.1213203436, 0.8786796564), (600, 3))
            Line((600, 3), (600, 0))
            Line((600, 0), (597, 0))
        make_face()
    extrude(amount=F2_T5_DEPTH, mode=Mode.SUBTRACT)

    # F2_s8 → F2_t7 (cut)
    with BuildSketch(Plane.XZ.offset(-6.3484800354)):
        with BuildLine():
            ThreePointArc((597.9, 19.1775744099), (599.4186773245, 20.2645680792), (600, 22.0393920142))
            Line((600, 22.0393920142), (600, 19.5))
            ThreePointArc((600, 19.5), (598.937696105, 19.4189240807), (597.9, 19.1775744099))
        make_face()
        with BuildLine():
            ThreePointArc((600, 2.9606079858), (599.4186773245, 4.7354319208), (597.9, 5.8224255901))
            ThreePointArc((597.9, 5.8224255901), (598.937696105, 5.5810759193), (600, 5.5))
            Line((600, 5.5), (600, 2.9606079858))
        make_face()
    extrude(amount=F2_T7_DEPTH, mode=Mode.SUBTRACT)


solid = f1.part
